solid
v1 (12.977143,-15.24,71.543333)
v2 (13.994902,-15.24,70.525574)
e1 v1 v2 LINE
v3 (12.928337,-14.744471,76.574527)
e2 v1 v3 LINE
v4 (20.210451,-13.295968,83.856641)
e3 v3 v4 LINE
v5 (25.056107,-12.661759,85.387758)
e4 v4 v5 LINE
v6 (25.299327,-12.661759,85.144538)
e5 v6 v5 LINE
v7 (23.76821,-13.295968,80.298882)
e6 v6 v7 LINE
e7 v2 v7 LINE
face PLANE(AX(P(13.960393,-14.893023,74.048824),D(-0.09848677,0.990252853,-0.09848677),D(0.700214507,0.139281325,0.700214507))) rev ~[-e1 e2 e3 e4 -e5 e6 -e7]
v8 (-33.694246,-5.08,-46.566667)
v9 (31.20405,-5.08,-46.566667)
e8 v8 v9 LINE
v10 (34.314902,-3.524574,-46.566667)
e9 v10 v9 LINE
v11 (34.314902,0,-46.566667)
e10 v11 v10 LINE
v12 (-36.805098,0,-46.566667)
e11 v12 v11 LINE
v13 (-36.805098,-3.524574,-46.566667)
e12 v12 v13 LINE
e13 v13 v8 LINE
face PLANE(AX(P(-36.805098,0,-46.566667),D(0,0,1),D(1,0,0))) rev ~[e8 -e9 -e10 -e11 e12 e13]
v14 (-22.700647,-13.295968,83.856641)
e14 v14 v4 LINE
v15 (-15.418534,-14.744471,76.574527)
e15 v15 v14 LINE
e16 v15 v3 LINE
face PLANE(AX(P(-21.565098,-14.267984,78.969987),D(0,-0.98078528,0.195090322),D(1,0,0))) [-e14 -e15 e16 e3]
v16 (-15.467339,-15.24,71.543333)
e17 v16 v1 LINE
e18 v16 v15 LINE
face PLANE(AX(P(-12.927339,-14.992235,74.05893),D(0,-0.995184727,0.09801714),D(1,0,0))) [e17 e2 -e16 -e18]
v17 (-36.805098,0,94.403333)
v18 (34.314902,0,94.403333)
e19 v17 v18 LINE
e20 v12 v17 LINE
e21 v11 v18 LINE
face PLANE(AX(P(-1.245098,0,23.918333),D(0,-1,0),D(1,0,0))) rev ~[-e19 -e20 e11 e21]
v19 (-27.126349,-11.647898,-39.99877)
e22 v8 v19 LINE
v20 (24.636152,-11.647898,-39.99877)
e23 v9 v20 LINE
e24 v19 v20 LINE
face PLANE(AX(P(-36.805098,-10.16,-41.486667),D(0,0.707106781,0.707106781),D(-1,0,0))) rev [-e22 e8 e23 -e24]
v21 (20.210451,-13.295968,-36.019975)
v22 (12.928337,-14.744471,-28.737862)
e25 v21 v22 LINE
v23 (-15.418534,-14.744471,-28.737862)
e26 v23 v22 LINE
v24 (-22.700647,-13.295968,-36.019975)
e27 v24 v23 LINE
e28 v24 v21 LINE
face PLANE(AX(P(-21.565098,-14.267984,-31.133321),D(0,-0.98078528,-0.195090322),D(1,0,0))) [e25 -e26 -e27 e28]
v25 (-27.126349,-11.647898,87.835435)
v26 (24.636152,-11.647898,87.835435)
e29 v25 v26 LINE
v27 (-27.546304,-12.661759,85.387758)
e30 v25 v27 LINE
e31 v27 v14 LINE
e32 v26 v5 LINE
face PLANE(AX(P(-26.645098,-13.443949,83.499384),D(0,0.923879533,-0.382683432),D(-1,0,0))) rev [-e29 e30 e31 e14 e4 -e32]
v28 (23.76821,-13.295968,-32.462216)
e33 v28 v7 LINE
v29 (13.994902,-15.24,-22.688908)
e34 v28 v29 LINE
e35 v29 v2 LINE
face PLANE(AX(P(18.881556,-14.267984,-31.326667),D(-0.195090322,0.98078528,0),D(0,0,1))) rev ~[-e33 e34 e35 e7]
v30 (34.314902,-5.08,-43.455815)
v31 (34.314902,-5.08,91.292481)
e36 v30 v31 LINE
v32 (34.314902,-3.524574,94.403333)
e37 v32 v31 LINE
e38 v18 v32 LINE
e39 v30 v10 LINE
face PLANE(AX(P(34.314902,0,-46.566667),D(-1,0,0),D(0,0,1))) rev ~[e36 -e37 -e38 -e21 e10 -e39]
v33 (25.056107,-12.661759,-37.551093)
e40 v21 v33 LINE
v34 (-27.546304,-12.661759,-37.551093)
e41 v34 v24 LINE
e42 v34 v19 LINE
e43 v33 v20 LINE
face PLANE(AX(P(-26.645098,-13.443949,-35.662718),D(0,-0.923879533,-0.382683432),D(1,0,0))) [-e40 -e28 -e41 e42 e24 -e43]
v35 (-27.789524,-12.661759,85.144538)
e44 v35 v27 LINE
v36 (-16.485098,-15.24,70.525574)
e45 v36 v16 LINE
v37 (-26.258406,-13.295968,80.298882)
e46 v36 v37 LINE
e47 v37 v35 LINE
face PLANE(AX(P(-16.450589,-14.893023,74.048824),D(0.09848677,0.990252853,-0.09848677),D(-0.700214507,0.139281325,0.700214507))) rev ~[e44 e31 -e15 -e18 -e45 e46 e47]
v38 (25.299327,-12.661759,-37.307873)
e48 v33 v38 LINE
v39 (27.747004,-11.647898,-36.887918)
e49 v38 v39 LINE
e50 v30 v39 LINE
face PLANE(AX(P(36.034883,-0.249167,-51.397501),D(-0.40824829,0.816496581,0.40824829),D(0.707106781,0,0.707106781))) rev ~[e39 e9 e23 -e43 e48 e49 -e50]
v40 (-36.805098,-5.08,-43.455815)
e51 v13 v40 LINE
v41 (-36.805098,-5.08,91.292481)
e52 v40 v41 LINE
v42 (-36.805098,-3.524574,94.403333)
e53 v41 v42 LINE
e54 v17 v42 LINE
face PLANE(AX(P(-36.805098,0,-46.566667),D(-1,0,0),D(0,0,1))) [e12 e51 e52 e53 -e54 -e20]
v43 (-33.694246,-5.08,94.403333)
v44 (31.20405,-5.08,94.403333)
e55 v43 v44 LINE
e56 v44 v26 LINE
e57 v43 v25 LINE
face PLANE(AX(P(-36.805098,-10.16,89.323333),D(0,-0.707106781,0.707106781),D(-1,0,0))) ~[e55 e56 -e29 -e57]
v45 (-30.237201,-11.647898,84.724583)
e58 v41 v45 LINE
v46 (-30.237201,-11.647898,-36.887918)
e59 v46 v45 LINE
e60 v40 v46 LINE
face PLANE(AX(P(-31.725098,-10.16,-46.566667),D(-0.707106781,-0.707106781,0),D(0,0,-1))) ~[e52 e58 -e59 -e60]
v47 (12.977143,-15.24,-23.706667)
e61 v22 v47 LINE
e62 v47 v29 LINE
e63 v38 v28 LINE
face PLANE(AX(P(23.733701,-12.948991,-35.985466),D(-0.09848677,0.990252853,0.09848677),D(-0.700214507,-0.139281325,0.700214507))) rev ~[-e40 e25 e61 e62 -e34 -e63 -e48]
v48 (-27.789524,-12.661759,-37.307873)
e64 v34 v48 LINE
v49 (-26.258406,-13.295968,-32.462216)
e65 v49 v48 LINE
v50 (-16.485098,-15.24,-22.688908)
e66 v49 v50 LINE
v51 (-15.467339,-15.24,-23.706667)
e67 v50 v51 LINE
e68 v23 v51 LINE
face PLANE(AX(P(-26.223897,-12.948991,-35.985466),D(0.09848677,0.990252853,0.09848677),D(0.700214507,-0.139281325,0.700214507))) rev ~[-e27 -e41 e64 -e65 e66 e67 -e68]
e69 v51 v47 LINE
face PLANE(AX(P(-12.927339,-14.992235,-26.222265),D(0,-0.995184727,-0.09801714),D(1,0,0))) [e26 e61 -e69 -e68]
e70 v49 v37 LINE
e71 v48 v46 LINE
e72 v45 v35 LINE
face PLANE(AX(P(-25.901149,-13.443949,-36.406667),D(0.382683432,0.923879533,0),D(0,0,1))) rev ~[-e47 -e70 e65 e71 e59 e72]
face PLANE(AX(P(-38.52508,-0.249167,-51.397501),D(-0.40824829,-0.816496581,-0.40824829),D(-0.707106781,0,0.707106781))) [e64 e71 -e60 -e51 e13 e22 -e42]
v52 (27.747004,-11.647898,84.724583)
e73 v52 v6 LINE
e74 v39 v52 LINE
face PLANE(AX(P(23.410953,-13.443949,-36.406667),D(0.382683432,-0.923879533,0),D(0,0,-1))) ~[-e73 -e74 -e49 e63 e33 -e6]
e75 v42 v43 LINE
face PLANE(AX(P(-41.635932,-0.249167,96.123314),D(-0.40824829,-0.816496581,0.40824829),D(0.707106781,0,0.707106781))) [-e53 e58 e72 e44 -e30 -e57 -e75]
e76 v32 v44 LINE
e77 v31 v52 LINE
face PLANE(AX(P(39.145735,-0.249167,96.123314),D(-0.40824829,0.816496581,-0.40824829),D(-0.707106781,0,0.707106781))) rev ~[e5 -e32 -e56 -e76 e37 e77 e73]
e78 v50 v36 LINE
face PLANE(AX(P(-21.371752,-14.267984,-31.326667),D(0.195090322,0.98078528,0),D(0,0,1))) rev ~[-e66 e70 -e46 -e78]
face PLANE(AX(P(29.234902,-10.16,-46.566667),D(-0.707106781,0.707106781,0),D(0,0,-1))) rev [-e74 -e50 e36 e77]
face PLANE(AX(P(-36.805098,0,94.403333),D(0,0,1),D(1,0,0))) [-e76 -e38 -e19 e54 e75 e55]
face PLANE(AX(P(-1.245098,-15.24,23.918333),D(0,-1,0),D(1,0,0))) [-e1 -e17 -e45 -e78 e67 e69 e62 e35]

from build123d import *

# Parameters (mm, degrees)
F0_W        = 71.12
F0_H        = 140.97
F1_DEPTH    = 15.24
F2_SIZE     = 10.16
F3_SIZE     = 5.08
F4_SIZE     = 5.08
F5_SIZE     = 2.54
F6_SIZE     = 2.54
F7_T1_DEPTH = 24.5183278918
F7_T3_DEPTH = 24.5183278918
F7_T5_DEPTH = 24.5183278918
F7_T7_DEPTH = 24.5183278918


# Not quite as in the source:
# - a fillet or chamfer that OpenCascade refuses, or shapes differently, is made with other operations: its cross-section is extruded or revolved along the edge and cut away or added


with BuildPart() as f1:
    # F0 (on Front) → F1 (new body)
    with BuildSketch(Plane.XZ):
        with Locations((-1.2450981867, 23.9183327848)):
            Rectangle(F0_W, F0_H)
    extrude(amount=F1_DEPTH)

    # F2
    f2_edges = [f1.edges().sort_by_distance(p)[0] for p in [
        (-1.245098, -15.24, 94.403333),
        (34.314902, -15.24, 23.918333),
        (-36.805098, -15.24, 23.918333),
        (-1.245098, -15.24, -46.566667),
    ]]
    chamfer(f2_edges, length=F2_SIZE)

    # F3
    f3_edges = [f1.edges().sort_by_distance(p)[0] for p in [
        (-26.645098, -15.24, 23.918333),
        (-1.245098, -15.24, -36.406667),
        (24.154902, -15.24, 23.918333),
        (-1.245098, -15.24, 84.243333),
    ]]
    chamfer(f3_edges, length=F3_SIZE)

    # F4
    f4_edges = [f1.edges().sort_by_distance(p)[0] for p in [
        (-1.245098, -15.24, 79.163333),
        (-1.245098, -15.24, -31.326667),
        (-21.565098, -15.24, 23.918333),
        (19.074902, -15.24, 23.918333),
    ]]
    chamfer(f4_edges, length=F4_SIZE)

    # F5
    f5_edges = [f1.edges().sort_by_distance(p)[0] for p in [
        (18.881556, -14.267984, 78.969987),
        (-21.371752, -14.267984, 78.969987),
        (-21.371752, -14.267984, -31.133321),
        (18.881556, -14.267984, -31.133321),
    ]]
    chamfer(f5_edges, length=F5_SIZE)

    # F6
    f6_edges = [f1.edges().sort_by_distance(p)[0] for p in [
        (-1.245098, -15.24, 74.083333),
        (-1.245098, -15.24, -26.246667),
    ]]
    chamfer(f6_edges, length=F6_SIZE)

    # F7: chamfer of 2.54 on 4 edges, made by hand

    # F7_s2 → F7_t1 (cut)
    with BuildSketch(Plane(origin=(29.0610725046, 29.0610725046, -29.0610725046), x_dir=(0.7071067812, -0.7071067812, 0), z_dir=(-0.5773502692, -0.5773502692, 0.5773502692))):
        Polygon((25.6566976907, -27.3564258793), (27.8564022163, -23.5464258793), (27.8564022163, -26.0864258793), align=None)
    extrude(amount=F7_T1_DEPTH, mode=Mode.SUBTRACT)

    # F7_s4 → F7_t3 (cut)
    with BuildSketch(Plane(origin=(45.0066276944, 45.0066276944, 45.0066276944), x_dir=(0.7071067812, -0.7071067812, 0), z_dir=(-0.5773502692, -0.5773502692, -0.5773502692))):
        Polygon((27.8564022163, 62.6048997598), (25.6566976907, 66.4148997598), (27.8564022163, 65.1448997598), align=None)
    extrude(amount=F7_T3_DEPTH, mode=Mode.SUBTRACT)

    # F7_s6 → F7_t5 (cut)
    with BuildSketch(Plane(origin=(-45.8366931523, 45.8366931523, 45.8366931523), x_dir=(0.7071067812, 0.7071067812, 0), z_dir=(0.5773502692, -0.5773502692, -0.5773502692))):
        Polygon((-29.6172369585, 61.5882813474), (-27.4175324329, 65.3982813474), (-29.6172369585, 64.1282813474), align=None)
    extrude(amount=F7_T5_DEPTH, mode=Mode.SUBTRACT)

    # F7_s8 → F7_t7 (cut)
    with BuildSketch(Plane(origin=(-29.8911379624, 29.8911379624, -29.8911379624), x_dir=(0.7071067812, 0.7071067812, 0), z_dir=(0.5773502692, -0.5773502692, 0.5773502692))):
        Polygon((-27.4175324329, -26.3398074669), (-29.6172369585, -22.5298074669), (-29.6172369585, -25.0698074669), align=None)
    extrude(amount=F7_T7_DEPTH, mode=Mode.SUBTRACT)


solid = f1.part
